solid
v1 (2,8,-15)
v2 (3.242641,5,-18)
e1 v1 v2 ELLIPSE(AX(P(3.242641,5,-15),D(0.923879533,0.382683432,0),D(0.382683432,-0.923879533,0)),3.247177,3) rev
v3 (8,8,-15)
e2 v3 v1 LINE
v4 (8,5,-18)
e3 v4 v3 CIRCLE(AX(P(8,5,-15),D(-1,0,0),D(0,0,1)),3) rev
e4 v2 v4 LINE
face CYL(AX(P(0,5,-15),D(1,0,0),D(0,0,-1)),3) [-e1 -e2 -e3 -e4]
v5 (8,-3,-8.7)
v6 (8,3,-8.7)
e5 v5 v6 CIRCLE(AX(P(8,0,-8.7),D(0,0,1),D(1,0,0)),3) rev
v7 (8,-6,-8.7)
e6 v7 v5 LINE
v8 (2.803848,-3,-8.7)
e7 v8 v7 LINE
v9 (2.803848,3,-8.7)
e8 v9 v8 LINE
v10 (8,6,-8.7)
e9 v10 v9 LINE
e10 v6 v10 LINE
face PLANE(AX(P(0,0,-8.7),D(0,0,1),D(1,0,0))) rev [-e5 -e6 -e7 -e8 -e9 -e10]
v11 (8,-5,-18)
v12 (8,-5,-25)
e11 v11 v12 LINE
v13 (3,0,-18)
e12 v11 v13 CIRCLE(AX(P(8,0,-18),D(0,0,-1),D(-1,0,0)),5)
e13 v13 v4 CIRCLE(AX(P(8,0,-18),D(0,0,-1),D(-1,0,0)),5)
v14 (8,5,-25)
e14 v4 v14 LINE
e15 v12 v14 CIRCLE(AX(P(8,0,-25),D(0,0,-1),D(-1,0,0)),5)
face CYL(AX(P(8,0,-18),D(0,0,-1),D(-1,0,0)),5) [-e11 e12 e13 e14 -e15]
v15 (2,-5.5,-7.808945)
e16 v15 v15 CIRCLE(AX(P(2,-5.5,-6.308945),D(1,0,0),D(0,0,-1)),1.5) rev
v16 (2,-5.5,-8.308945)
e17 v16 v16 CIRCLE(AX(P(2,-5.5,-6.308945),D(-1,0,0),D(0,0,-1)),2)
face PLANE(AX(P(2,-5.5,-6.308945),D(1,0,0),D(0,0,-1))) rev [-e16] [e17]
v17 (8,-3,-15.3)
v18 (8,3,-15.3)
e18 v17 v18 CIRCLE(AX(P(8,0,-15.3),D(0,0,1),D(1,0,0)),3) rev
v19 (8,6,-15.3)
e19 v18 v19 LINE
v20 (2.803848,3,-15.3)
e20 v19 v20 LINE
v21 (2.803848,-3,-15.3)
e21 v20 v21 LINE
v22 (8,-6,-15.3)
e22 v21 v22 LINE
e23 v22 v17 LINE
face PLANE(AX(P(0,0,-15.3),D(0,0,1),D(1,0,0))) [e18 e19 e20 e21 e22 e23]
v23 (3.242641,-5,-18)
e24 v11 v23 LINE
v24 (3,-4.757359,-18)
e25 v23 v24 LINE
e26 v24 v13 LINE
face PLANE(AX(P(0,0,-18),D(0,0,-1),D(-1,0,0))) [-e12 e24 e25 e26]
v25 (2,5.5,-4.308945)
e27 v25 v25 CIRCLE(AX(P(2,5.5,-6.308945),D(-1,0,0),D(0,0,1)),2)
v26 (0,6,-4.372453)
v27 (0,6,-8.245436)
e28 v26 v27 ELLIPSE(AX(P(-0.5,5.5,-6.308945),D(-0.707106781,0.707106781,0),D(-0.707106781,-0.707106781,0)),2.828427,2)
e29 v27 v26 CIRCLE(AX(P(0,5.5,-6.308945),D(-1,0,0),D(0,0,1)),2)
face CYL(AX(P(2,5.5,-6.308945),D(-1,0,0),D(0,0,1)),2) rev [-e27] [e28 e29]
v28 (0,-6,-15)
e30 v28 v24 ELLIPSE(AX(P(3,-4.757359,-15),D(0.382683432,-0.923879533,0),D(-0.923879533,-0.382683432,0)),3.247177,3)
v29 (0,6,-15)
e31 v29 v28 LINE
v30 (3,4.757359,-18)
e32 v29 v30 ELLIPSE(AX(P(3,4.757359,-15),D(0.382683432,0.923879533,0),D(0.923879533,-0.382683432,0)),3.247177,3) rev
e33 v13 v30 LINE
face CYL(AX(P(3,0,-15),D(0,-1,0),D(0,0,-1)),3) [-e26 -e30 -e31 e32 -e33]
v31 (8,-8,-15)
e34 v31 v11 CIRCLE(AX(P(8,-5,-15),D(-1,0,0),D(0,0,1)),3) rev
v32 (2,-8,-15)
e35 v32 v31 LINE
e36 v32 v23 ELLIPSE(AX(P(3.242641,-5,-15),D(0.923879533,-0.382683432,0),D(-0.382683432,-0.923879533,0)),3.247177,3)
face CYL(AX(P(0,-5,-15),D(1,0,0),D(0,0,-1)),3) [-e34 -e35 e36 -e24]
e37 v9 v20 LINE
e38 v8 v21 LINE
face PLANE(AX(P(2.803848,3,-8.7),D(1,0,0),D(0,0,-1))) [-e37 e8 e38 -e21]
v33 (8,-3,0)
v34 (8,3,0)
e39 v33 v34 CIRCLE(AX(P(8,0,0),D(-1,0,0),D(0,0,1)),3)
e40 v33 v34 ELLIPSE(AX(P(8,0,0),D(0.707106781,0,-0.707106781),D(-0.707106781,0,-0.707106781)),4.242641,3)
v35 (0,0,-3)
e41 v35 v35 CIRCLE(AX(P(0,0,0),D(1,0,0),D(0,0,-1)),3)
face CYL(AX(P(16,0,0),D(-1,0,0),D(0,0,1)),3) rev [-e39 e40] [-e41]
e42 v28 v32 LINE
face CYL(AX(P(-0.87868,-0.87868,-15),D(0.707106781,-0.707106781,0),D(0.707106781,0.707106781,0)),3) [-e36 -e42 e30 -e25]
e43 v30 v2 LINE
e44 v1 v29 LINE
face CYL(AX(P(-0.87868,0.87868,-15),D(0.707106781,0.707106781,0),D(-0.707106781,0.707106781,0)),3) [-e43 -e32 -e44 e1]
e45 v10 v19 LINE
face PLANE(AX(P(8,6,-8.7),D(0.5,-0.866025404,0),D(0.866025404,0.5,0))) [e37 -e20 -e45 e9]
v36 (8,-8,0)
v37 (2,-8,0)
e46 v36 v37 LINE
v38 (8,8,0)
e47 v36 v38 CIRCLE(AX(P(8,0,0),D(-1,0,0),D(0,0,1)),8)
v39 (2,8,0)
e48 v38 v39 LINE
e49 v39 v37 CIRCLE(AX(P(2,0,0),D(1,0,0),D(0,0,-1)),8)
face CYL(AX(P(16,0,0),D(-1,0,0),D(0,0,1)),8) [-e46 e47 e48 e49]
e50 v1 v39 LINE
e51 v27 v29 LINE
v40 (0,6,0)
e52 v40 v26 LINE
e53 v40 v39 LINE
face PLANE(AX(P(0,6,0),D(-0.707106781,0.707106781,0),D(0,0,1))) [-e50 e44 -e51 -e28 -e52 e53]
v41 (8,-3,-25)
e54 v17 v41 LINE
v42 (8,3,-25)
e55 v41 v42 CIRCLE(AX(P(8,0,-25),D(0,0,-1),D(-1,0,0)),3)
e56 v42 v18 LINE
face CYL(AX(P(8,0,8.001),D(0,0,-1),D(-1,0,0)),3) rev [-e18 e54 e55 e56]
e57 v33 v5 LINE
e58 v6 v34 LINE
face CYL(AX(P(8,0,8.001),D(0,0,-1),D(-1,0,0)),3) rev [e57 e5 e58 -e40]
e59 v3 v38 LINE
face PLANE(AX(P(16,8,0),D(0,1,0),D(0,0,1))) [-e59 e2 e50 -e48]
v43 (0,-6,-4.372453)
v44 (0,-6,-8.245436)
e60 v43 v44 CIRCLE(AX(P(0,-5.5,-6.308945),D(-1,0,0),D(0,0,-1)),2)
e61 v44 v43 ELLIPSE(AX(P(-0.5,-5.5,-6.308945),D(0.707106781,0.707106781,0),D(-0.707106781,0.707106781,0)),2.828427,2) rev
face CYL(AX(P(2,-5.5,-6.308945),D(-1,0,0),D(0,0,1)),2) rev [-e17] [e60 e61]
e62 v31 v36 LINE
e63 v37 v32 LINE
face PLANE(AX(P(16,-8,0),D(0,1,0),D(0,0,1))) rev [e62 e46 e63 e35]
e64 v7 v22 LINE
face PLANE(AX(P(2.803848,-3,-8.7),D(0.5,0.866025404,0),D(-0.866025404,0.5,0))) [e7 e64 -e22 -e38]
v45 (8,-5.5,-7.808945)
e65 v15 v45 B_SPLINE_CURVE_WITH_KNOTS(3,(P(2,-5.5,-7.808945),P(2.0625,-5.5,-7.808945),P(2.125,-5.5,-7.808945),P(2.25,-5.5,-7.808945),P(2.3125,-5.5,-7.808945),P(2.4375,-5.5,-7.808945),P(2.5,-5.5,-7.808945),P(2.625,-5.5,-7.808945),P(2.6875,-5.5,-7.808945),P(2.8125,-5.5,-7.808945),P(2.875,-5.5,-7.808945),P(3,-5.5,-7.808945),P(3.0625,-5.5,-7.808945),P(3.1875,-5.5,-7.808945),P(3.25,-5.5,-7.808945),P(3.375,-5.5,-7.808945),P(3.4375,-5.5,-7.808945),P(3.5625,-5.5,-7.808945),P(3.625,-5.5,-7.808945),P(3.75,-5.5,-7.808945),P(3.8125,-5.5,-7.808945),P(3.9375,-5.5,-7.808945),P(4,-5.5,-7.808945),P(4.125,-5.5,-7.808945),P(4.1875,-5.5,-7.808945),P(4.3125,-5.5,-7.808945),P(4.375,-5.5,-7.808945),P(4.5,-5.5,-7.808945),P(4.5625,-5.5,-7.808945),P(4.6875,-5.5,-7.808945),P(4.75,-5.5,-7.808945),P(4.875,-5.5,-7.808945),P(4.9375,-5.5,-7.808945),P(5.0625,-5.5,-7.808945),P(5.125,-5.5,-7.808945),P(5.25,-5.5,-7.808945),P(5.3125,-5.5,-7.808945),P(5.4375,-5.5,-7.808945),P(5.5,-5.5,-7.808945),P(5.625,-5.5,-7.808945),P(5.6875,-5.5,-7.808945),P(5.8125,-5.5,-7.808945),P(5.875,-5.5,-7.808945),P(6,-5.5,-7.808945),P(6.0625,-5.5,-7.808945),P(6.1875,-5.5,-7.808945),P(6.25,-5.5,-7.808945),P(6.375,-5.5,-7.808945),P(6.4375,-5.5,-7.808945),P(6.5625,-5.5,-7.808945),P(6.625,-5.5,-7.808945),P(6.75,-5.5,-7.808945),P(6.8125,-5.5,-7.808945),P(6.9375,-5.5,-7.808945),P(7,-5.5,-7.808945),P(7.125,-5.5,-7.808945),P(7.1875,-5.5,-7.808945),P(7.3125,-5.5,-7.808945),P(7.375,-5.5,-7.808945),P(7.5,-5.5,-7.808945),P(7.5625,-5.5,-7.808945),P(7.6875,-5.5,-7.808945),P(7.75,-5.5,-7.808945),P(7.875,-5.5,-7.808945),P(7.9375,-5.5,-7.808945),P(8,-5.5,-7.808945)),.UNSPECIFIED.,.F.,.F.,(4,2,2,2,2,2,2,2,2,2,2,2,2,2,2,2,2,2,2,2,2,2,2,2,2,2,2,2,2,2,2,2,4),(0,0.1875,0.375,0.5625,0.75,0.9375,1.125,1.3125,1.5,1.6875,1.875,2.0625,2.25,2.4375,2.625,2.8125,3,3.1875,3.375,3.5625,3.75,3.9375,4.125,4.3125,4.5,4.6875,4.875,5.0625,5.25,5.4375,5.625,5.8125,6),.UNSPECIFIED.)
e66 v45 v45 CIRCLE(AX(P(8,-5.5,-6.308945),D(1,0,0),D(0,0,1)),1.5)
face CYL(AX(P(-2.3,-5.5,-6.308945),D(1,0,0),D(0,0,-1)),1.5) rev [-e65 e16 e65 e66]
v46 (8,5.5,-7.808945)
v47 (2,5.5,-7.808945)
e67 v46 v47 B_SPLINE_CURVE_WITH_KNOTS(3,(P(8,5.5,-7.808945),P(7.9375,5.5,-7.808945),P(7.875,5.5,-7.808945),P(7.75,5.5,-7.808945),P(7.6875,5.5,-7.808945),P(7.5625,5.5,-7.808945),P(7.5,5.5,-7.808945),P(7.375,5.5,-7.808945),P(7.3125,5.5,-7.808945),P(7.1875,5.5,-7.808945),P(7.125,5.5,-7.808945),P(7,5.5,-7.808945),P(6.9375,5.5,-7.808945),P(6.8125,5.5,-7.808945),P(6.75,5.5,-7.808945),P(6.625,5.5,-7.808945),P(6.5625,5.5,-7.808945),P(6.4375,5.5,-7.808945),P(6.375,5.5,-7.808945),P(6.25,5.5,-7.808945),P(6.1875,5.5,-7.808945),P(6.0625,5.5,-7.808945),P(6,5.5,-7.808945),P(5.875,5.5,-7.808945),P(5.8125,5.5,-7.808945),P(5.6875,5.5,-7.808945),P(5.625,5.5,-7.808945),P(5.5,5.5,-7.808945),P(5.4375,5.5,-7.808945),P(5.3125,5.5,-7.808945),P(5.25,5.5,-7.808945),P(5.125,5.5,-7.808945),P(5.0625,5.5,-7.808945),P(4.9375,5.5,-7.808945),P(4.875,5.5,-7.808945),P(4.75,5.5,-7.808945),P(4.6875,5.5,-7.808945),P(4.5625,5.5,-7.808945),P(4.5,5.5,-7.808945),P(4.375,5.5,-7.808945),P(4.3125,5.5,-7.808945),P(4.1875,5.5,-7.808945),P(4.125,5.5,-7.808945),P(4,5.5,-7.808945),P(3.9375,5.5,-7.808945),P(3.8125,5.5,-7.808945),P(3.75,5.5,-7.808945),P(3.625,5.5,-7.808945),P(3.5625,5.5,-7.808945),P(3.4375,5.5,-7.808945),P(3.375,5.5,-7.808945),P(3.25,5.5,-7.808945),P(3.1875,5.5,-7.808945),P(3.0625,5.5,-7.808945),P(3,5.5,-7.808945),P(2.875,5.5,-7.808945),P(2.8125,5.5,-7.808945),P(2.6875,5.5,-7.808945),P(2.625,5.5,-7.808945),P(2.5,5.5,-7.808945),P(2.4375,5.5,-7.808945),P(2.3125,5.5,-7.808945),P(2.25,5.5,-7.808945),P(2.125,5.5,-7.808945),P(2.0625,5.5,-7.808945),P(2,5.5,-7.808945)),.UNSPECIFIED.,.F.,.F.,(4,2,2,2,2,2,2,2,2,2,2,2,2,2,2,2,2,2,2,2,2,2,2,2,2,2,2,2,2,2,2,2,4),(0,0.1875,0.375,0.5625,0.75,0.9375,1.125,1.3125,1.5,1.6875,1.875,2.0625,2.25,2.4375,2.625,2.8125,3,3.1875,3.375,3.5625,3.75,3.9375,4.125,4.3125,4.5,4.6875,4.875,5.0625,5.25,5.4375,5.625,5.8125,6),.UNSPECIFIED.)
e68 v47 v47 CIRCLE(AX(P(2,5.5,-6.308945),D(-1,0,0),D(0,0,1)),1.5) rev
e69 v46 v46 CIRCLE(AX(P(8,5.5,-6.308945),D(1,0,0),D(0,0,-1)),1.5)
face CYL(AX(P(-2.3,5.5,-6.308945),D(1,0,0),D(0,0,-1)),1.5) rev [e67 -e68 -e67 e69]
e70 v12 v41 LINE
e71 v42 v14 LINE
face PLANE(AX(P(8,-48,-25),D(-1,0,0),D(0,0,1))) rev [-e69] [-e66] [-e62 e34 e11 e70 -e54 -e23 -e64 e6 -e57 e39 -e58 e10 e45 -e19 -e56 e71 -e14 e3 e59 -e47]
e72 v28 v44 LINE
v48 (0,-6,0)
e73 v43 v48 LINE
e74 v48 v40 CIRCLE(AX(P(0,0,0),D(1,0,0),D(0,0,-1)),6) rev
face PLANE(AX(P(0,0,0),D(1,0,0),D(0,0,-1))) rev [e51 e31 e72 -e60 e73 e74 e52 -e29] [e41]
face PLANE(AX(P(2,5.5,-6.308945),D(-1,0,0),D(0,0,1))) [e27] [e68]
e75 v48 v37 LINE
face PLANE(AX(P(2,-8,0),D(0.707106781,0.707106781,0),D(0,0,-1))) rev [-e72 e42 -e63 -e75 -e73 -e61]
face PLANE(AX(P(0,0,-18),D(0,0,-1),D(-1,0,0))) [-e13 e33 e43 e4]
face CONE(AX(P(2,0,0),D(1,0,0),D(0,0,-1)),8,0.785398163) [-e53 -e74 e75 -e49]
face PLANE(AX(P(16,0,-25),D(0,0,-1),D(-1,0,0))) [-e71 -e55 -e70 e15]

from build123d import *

# Parameters (mm, degrees)
BOSS_EXTRUDE1_DEPTH          = 16
CHAMFER2_SIZE                = 2
ENL_V_MAT_EXTRU_1_REACH      = 39.537
ENL_V_MAT_EXTRU_1_END_RADIUS = 3
ESQUISSE1_R                  = 3
ESQUISSE2_W                  = 9.751627811
ESQUISSE2_H                  = 34.282380126
ENL_V_MAT_EXTRU_2_DEPTH      = 56
ENL_V_MAT_EXTRU_3_DEPTH      = 3.3
ENL_V_MAT_EXTRU_3_DEPTH_BACK = 3.3
ESQUISSE8_R                  = 1.5
ENL_V_MAT_EXTRU_4_DEPTH      = 10.3
ESQUISSE9_R                  = 2
ENL_V_MAT_EXTRU_5_DEPTH      = 2
ENL_V_MAT_EXTRU_6_DEPTH      = 7
CONG_1_R                     = 3


with BuildPart() as part:
    # Sketch1 → Boss-Extrude1 (new body)
    with BuildSketch(Plane(origin=(0, 0, 0), x_dir=(0, -1, 0), z_dir=(1, 0, 0))):
        with BuildLine():
            ThreePointArc((-8, 0), (0, 8), (8, 0))
            Line((8, 0), (8, 25))
            Line((8, 25), (-8, 25))
            Line((-8, 25), (-8, 0))
        make_face()
        with BuildLine():
            ThreePointArc((-3, 0), (0, 3), (3, 0))
            Line((3, 0), (8, 0))
            ThreePointArc((8, 0), (0, 8), (-8, 0))
            Line((-8, 0), (-3, 0))
        make_face()
        with BuildLine():
            Line((8, 0), (3, 0))
            ThreePointArc((3, 0), (0, -3), (-3, 0))
            Line((-3, 0), (-8, 0))
            ThreePointArc((-8, 0), (0, -8), (8, 0))
        make_face()
    extrude(amount=BOSS_EXTRUDE1_DEPTH)

    # Chamfer2
    chamfer2_edges = [part.edges().sort_by_distance(p)[0] for p in [
        (16, 8, -12.5),
        (16, 0, 8),
        (0, 8, -12.5),
        (0, -8, -12.5),
        (0, 0, 8),
        (16, -8, -12.5),
    ]]
    chamfer(chamfer2_edges, length=CHAMFER2_SIZE)

    # Enlèv. mat.-Extru.1: up to this cylinder (the profile starts outside it)
    enl_v_mat_extru_1_end = Plane(origin=(8, 0, 0), z_dir=(-1, 0, 0)) * Cylinder(ENL_V_MAT_EXTRU_1_END_RADIUS, 86.074, mode=Mode.PRIVATE)
    # Esquisse1 → Enlèv. mat.-Extru.1 (cut, up to the surface)
    with BuildSketch(Plane(origin=(0, 0, -25), x_dir=(-1, 0, 0), z_dir=(0, 0, -1)), mode=Mode.PRIVATE) as enl_v_mat_extru_1_sk1:
        with Locations((-8, 0)):
            Circle(ESQUISSE1_R)
    enl_v_mat_extru_1_tool1 = extrude(enl_v_mat_extru_1_sk1.sketch, amount=-ENL_V_MAT_EXTRU_1_REACH, mode=Mode.PRIVATE) - enl_v_mat_extru_1_end
    add(enl_v_mat_extru_1_tool1.solids().sort_by_distance((8, 0, -25))[0], mode=Mode.SUBTRACT)

    # Esquisse2 → Enlèv. mat.-Extru.2 (cut)
    with BuildSketch(Plane(origin=(0, 8, 0), x_dir=(1, 0, 0), z_dir=(0, 1, 0))):
        with Locations((12.875813906, 7.858809937)):
            Rectangle(ESQUISSE2_W, ESQUISSE2_H)
    extrude(amount=-ENL_V_MAT_EXTRU_2_DEPTH, mode=Mode.SUBTRACT)

    # Esquisse4 → Enlèv. mat.-Extru.3 (cut, two sides: drawn at the far end of the back side and taken through both)
    with BuildSketch(Plane.XY.offset(-12).offset(-ENL_V_MAT_EXTRU_3_DEPTH_BACK)):
        Polygon((13.196152423, -3), (13.196152423, 3), (8, 6), (2.803847577, 3), (2.803847577, -3), (8, -6), align=None)
    extrude(amount=ENL_V_MAT_EXTRU_3_DEPTH + ENL_V_MAT_EXTRU_3_DEPTH_BACK, mode=Mode.SUBTRACT)

    # Esquisse8 → Enlèv. mat.-Extru.4 (cut)
    with BuildSketch(Plane(origin=(8, 0, 0), x_dir=(0, 0, -1), z_dir=(1, 0, 0))):
        with Locations((6.308944807, 5.5)):
            Circle(ESQUISSE8_R)
        with Locations(Location((6.308944807, -5.5, 0), (0, 0, 340.528779366))):
            Circle(ESQUISSE8_R)
    extrude(amount=-ENL_V_MAT_EXTRU_4_DEPTH, mode=Mode.SUBTRACT)

    # Esquisse9 → Enlèv. mat.-Extru.5 (cut)
    with BuildSketch(Plane.ZY):
        with Locations((-6.308944807, 5.5)):
            Circle(ESQUISSE9_R)
        with Locations(Location((-6.308944807, -5.5, 0), (0, 0, 345.522487814))):
            Circle(ESQUISSE9_R)
    extrude(amount=-ENL_V_MAT_EXTRU_5_DEPTH, mode=Mode.SUBTRACT)

    # Esquisse10 → Enlèv. mat.-Extru.6 (cut)
    with BuildSketch(Plane(origin=(0, 0, -25), x_dir=(-1, 0, 0), z_dir=(0, 0, -1))):
        with BuildLine():
            Line((-8, 8), (-8, 5))
            ThreePointArc((-8, 5), (-3, 0), (-8, -5))
            Line((-8, -5), (-8, -5.041535343))
            Line((-8, -5.041535343), (-8, -8))
            Line((-8, -8), (-2, -8))
            Line((-2, -8), (0, -6))
            Line((0, -6), (0, 6))
            Line((0, 6), (-2, 8))
            Line((-2, 8), (-8, 8))
        make_face()
    extrude(amount=-ENL_V_MAT_EXTRU_6_DEPTH, mode=Mode.SUBTRACT)

    # Congé1
    cong_1_edges = [part.edges().sort_by_distance(p)[0] for p in [
        (5, -8, -18),
        (1, -7, -18),
        (0, 0, -18),
        (1, 7, -18),
        (5, 8, -18),
    ]]
    fillet(cong_1_edges, radius=CONG_1_R - 0.0001)  # a hair under: the kernel refuses the full size


solid = part.part
